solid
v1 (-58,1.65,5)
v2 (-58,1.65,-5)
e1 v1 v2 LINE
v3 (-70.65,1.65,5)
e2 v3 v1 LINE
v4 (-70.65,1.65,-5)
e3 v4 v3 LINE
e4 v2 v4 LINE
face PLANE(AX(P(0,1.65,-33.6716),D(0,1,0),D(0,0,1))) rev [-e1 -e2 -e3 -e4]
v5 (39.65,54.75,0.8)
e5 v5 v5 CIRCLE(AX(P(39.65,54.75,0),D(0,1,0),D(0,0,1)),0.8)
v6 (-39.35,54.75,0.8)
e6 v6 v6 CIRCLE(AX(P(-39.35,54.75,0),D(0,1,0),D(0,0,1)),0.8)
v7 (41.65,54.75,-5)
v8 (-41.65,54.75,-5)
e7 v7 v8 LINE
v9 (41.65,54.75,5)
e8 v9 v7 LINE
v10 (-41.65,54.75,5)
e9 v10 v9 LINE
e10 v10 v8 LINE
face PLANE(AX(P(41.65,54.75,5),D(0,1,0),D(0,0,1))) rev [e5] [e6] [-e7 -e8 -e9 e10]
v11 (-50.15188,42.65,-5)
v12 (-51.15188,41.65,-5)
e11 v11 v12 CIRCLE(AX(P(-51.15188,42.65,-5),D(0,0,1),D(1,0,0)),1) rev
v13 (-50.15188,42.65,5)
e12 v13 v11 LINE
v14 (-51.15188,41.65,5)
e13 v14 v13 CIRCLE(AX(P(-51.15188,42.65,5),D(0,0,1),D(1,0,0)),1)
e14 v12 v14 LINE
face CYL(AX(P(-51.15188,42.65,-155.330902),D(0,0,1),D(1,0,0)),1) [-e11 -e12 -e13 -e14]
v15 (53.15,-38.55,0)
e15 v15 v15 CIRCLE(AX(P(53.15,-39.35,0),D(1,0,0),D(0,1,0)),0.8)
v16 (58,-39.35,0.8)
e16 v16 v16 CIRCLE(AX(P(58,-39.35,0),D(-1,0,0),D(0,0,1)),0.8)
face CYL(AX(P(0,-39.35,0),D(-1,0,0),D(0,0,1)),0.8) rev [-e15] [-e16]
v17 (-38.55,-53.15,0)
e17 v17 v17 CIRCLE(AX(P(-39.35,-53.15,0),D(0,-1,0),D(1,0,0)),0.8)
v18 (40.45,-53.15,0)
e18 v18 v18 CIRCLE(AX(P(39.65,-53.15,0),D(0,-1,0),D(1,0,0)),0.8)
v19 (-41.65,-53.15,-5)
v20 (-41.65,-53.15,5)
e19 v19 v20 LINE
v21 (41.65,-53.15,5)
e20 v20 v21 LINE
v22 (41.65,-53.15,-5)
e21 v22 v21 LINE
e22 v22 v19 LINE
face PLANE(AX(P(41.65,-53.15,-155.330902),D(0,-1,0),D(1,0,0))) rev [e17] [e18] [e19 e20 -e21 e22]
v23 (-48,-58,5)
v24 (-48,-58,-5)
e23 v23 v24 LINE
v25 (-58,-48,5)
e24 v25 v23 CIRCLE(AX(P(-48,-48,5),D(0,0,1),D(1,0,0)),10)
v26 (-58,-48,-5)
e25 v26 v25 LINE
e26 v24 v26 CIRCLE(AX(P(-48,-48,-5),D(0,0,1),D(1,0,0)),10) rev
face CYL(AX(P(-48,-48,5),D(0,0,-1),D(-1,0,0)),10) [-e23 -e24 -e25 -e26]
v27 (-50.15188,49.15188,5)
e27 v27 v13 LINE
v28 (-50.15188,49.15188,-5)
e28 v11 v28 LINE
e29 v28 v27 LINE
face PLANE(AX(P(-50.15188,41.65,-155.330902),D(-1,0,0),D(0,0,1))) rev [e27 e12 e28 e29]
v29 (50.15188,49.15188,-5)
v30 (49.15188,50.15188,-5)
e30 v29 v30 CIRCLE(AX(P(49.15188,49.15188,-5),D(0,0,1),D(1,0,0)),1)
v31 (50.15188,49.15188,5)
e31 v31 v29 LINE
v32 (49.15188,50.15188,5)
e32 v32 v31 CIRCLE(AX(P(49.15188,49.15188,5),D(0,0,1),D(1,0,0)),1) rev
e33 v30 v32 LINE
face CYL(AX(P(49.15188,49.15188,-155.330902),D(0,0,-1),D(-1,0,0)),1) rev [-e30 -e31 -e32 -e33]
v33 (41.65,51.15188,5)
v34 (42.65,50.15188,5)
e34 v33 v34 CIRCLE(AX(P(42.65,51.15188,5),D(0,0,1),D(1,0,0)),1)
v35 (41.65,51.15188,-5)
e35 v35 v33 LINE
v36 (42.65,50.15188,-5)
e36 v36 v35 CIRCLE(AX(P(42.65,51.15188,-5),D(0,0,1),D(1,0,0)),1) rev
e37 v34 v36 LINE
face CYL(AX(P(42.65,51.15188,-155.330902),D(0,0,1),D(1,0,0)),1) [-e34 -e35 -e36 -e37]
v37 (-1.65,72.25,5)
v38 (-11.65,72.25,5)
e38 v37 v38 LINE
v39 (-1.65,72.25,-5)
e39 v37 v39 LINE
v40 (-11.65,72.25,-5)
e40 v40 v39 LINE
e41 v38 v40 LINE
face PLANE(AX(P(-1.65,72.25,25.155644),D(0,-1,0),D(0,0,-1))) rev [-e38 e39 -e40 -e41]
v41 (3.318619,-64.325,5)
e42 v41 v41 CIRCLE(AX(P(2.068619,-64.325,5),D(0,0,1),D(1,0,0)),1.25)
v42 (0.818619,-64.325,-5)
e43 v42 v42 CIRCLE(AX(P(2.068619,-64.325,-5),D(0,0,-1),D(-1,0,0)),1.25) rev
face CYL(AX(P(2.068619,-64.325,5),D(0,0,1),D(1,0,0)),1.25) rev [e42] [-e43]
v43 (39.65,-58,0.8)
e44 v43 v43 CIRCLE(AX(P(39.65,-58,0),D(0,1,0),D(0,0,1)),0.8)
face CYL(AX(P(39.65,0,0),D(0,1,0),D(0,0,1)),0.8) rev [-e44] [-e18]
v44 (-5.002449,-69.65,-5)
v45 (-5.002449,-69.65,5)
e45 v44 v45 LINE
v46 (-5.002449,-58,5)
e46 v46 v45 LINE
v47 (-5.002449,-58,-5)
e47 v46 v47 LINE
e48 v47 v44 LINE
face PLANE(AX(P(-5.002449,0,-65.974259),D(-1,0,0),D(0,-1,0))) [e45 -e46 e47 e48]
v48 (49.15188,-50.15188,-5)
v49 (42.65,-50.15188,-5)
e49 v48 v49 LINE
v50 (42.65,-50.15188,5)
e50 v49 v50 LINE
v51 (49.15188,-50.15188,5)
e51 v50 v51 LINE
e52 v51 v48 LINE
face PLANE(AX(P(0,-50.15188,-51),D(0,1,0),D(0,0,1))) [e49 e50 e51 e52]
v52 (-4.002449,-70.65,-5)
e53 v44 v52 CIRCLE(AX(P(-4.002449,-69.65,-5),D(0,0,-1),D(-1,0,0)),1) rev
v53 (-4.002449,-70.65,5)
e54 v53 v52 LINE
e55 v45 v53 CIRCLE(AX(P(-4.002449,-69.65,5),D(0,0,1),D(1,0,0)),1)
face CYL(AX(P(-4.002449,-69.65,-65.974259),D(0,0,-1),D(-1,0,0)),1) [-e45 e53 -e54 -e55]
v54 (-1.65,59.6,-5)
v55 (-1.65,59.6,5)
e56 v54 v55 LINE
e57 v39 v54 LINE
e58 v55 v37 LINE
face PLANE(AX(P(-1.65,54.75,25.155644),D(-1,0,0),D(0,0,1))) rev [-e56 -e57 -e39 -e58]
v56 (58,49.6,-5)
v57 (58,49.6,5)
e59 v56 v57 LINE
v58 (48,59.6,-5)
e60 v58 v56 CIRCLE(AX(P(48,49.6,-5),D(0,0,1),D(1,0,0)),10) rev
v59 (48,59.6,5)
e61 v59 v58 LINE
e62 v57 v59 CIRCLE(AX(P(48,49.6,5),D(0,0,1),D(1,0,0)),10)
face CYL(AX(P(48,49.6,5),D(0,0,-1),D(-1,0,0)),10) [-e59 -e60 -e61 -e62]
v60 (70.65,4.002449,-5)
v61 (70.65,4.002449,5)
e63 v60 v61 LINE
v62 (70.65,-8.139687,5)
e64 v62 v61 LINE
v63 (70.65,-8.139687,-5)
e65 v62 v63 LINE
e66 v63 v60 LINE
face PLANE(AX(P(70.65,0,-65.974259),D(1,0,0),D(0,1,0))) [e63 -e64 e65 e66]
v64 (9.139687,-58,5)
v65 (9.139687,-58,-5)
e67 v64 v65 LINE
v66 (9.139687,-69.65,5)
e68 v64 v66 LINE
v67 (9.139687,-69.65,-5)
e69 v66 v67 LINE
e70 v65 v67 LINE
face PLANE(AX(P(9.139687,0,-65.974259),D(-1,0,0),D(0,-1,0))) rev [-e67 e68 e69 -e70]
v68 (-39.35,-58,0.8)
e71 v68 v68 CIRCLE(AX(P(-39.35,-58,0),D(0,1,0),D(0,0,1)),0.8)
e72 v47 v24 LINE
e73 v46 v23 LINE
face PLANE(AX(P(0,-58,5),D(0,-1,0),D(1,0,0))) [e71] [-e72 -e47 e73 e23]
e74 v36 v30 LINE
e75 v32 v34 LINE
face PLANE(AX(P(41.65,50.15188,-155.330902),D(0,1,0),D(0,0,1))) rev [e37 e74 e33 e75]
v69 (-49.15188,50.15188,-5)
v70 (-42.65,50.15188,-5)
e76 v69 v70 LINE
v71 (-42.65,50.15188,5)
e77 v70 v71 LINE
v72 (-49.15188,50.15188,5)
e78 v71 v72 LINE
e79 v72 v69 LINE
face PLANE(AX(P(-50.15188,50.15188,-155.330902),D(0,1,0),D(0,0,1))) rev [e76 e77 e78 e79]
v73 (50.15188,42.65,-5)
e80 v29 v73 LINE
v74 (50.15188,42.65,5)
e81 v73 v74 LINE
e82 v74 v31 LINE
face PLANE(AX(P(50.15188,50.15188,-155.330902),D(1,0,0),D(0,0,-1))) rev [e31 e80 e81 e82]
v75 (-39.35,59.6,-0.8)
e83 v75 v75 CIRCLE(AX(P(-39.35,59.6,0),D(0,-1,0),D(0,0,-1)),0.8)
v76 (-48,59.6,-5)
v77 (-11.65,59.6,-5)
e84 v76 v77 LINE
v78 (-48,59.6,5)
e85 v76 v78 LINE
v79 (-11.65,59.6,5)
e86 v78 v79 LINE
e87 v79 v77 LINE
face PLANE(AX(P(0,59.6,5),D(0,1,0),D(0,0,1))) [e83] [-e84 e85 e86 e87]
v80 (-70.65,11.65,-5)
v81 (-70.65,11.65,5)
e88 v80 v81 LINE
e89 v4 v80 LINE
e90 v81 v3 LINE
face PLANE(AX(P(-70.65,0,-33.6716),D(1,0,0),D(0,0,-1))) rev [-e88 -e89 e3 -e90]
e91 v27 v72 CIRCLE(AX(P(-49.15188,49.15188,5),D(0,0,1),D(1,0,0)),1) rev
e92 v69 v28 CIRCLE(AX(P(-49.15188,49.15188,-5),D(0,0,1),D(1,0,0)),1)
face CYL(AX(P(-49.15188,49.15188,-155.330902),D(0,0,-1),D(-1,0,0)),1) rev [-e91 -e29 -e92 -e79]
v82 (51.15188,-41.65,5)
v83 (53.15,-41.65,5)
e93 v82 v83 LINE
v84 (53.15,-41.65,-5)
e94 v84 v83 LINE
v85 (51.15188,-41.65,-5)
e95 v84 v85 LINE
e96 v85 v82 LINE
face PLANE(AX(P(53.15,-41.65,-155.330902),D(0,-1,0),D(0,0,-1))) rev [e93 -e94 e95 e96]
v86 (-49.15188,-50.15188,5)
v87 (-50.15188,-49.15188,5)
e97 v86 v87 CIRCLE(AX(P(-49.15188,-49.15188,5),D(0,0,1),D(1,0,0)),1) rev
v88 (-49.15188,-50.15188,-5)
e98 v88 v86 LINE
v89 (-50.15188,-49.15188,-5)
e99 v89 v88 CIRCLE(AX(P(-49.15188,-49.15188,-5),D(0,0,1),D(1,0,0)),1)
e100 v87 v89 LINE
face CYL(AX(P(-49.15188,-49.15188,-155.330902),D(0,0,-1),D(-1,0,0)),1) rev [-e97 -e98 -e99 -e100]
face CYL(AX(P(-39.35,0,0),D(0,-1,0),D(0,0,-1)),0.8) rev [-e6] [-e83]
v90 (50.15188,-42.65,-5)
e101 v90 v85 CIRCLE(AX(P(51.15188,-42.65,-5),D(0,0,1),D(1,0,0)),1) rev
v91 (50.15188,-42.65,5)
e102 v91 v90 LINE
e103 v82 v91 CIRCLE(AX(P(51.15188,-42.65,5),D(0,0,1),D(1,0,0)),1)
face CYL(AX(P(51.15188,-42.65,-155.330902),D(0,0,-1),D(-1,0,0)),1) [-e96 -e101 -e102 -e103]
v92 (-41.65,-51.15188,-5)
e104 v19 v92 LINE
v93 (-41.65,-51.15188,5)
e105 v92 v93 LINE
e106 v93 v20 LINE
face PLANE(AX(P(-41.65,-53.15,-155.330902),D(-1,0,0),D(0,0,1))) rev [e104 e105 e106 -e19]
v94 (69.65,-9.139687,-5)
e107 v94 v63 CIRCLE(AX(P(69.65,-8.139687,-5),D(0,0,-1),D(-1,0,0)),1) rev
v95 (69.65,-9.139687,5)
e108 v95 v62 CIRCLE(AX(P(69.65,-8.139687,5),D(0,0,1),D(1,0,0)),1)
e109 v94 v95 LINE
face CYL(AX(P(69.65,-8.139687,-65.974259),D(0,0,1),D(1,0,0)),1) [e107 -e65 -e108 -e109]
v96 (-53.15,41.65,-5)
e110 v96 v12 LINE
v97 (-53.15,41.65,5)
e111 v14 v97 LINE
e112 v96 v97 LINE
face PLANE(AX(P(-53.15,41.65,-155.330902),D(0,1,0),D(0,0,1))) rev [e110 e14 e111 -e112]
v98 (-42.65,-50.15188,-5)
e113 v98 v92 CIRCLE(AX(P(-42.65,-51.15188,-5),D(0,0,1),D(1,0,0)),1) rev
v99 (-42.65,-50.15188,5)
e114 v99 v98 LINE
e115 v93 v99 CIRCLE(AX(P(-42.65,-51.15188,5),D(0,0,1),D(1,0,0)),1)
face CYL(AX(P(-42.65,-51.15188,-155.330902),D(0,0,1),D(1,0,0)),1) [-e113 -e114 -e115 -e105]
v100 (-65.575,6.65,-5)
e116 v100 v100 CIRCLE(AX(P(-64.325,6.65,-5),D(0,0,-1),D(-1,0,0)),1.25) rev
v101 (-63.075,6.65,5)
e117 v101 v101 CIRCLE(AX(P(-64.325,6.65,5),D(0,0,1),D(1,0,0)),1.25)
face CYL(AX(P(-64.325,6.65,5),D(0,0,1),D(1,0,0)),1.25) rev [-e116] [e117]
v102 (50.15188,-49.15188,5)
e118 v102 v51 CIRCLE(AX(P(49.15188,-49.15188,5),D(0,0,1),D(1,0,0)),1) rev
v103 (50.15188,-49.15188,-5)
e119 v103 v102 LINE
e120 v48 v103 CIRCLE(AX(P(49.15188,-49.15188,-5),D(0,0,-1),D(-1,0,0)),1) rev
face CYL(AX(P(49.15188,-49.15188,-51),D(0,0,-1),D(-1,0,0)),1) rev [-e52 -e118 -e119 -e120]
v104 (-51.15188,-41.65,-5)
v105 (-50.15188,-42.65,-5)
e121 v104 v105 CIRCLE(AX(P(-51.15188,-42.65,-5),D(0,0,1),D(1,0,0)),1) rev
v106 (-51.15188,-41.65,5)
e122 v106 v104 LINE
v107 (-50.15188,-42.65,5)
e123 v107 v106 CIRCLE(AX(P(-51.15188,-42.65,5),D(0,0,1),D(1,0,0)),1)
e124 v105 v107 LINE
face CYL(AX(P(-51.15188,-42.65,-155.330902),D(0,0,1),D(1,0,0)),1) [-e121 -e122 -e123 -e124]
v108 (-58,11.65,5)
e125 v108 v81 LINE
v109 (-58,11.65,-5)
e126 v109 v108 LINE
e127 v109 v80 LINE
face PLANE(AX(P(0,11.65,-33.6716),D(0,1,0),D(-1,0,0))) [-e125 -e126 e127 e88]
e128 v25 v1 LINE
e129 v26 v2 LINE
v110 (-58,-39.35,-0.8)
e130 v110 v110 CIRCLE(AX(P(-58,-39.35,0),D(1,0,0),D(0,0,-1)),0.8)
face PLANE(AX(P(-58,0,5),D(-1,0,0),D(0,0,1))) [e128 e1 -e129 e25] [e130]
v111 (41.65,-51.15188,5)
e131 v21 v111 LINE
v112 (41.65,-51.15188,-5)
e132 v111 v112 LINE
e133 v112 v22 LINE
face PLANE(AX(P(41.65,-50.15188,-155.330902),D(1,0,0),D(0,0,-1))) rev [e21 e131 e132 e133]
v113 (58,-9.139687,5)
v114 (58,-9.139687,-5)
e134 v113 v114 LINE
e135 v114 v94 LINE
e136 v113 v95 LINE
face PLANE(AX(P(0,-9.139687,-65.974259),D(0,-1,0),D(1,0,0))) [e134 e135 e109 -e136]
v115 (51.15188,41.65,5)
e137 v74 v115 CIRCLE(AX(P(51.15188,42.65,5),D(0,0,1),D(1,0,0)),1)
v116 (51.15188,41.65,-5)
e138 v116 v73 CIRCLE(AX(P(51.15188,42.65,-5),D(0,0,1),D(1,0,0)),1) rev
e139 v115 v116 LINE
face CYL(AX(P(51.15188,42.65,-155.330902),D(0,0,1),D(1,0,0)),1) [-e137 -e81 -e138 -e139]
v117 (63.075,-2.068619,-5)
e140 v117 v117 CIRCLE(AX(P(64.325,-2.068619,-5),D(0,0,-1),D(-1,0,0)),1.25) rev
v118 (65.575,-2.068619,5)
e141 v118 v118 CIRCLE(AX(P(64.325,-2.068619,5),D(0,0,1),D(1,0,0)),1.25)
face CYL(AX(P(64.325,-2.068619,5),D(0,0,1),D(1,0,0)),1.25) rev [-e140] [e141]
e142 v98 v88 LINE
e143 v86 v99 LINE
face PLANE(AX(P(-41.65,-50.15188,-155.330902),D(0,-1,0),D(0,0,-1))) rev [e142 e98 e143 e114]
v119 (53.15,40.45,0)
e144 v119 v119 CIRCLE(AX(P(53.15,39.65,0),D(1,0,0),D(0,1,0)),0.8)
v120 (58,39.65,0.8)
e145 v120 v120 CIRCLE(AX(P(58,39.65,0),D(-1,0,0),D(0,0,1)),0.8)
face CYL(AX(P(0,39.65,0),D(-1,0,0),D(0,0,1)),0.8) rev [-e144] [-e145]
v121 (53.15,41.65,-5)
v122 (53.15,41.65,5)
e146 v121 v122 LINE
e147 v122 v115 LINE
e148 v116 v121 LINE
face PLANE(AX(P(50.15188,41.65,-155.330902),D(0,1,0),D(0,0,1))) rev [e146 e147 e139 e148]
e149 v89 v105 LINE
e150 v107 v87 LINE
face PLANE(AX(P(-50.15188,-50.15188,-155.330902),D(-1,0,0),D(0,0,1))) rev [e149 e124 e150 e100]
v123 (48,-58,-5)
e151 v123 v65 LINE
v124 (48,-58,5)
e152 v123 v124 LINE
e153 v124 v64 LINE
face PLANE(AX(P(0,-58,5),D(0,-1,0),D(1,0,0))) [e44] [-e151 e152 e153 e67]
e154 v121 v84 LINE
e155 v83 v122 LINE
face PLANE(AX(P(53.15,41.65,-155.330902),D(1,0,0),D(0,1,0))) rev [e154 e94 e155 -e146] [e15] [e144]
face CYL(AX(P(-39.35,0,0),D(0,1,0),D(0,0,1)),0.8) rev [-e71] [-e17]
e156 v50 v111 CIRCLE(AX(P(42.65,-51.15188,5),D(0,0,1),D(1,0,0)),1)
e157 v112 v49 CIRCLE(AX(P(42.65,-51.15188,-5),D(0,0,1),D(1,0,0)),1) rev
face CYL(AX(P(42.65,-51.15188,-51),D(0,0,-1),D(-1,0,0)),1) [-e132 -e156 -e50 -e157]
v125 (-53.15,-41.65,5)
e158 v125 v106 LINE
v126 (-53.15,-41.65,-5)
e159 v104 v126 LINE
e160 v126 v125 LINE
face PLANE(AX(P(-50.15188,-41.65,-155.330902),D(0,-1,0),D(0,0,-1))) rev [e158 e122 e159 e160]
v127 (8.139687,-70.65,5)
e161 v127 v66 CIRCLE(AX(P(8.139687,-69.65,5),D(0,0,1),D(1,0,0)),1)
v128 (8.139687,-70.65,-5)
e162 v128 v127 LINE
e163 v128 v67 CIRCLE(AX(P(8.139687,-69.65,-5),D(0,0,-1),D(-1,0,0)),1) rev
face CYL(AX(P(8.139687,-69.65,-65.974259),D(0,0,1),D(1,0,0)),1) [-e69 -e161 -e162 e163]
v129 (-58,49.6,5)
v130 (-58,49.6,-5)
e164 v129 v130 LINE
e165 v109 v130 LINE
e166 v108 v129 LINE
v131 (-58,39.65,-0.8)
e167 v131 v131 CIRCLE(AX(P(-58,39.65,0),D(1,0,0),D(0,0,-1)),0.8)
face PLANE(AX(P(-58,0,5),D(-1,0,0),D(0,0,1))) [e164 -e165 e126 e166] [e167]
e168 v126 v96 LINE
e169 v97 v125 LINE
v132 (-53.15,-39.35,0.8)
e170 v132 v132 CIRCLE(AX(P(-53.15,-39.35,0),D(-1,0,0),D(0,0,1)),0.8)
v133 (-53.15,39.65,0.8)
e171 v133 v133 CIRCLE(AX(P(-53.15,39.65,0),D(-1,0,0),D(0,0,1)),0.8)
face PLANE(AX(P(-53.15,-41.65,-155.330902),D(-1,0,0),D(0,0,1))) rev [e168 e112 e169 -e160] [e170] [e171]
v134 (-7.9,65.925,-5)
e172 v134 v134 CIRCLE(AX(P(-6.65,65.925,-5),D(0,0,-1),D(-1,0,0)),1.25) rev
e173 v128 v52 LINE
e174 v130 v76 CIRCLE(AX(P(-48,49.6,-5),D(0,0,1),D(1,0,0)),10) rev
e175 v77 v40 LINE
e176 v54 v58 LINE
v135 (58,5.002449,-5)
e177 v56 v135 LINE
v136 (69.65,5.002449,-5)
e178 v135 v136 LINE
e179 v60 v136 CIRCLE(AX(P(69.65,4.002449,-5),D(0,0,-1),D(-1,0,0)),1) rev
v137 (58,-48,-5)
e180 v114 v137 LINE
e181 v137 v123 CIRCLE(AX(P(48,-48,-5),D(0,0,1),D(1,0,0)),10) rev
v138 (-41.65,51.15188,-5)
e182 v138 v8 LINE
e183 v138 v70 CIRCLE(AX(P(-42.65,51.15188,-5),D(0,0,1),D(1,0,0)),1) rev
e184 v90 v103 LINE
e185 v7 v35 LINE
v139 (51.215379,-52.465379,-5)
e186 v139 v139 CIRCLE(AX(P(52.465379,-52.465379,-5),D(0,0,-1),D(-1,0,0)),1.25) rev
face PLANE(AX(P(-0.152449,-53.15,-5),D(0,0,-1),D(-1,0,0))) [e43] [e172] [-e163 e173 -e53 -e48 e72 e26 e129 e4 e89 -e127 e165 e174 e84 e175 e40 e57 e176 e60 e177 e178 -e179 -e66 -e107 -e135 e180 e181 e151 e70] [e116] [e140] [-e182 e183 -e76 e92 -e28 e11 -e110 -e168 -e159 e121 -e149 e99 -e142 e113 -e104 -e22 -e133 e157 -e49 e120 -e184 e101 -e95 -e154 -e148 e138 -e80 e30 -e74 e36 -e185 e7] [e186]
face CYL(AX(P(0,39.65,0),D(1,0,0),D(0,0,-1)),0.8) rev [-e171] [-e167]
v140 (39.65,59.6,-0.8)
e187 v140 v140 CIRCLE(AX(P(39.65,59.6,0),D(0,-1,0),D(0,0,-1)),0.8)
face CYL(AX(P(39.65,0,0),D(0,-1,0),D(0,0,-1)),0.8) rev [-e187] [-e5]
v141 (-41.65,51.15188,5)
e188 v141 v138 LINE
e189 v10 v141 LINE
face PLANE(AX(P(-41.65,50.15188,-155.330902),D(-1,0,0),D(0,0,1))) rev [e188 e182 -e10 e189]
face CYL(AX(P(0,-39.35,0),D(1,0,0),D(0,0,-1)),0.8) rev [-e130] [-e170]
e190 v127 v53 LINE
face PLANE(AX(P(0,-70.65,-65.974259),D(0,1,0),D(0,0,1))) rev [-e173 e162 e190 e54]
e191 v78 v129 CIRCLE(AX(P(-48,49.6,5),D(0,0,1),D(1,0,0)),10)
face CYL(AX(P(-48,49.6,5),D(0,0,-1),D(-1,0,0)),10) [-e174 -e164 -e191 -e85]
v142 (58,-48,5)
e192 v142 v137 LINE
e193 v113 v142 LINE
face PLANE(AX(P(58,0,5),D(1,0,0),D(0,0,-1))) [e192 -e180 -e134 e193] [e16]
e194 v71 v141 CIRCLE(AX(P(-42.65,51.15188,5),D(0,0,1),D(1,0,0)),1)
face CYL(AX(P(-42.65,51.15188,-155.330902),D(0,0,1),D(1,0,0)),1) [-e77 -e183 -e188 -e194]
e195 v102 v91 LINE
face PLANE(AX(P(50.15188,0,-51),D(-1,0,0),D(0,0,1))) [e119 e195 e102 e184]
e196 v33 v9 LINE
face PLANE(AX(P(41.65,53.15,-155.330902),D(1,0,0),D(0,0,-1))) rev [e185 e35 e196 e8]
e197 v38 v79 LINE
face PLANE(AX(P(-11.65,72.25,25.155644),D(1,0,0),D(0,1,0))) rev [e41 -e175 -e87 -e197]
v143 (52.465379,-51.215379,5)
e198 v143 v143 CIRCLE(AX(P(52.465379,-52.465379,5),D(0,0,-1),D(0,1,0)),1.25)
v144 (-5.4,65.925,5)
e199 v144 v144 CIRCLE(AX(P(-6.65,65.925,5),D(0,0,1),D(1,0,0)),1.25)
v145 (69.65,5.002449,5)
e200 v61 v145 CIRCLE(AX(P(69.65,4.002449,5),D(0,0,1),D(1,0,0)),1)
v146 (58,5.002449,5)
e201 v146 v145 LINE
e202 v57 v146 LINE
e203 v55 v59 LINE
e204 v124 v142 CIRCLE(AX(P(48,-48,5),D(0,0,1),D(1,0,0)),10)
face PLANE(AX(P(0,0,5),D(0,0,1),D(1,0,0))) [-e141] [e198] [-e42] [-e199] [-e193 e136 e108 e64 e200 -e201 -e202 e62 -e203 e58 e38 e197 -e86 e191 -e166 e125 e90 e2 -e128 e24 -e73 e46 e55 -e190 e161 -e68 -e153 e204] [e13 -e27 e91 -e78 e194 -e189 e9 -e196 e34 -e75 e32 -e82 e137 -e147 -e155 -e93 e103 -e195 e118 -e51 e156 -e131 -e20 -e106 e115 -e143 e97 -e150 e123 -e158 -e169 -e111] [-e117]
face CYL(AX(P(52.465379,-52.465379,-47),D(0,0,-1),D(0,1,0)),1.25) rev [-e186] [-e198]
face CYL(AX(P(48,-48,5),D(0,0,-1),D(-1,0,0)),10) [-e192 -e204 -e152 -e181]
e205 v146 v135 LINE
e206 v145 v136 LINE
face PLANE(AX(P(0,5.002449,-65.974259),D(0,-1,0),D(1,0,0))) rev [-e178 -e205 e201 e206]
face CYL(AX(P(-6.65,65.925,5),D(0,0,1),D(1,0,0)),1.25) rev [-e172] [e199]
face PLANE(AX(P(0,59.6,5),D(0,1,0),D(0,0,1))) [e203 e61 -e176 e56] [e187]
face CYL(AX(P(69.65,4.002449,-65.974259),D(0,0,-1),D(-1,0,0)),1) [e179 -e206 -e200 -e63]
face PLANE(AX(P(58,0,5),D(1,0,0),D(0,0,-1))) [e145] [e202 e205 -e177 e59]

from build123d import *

# Parameters (mm, degrees)
SKETCH1_W                      = 116
SKETCH1_H                      = 117.6
BASE_DEPTH                     = 5
ARM_DEPTH                      = 5
CUT_EXTRUDE1_DEPTH             = 99.905226688
BOSS_EXTRUDE4_DEPTH            = 31
CLEARANCE_DEPTH                = 20
CUT_EXTRUDE2_DEPTH             = 94.167376264
CUT_EXTRUDE2_DEPTH_BACK        = 94.167376264
SKETCH42_W                     = 83.3
SKETCH42_H                     = 1.6
SKETCH12_W                     = 0.8
SKETCH12_H                     = 59.6
M2X0_4_TAPPED_HOLE1_AT_2_COUNT = 2
M2X0_4_TAPPED_HOLE1_AT_2_PITCH = 79
MIRROR1_COPY_1_SKETCH_W        = 0.8
MIRROR1_COPY_1_SKETCH_H        = 59.6
SKETCH15_W                     = 0.8
SKETCH15_H                     = 58
M2X0_4_TAPPED_HOLE2_AT_2_COUNT = 2
M2X0_4_TAPPED_HOLE2_AT_2_PITCH = 79
MIRROR2_COPY_1_SKETCH_W        = 0.8
MIRROR2_COPY_1_SKETCH_H        = 58
SKETCH16_W                     = 17.5
SKETCH16_H                     = 10
EXTENDER_DEPTH                 = 28.6716
ANGLED_HORIZONTAL_DEPTH        = 13.3284
ARM_START                      = -5
SKETCH21_W                     = 17.5
SKETCH21_H                     = 10
SKETCH21_W_2                   = 10
SKETCH21_H_2                   = 17.5
ARM_HOLDER_DEPTH               = 10
SKETCH44_W                     = 10
SKETCH44_H                     = 17.5
BOSS_EXTRUDE20_DEPTH           = 28.6716
BOSS_EXTRUDE21_DEPTH           = 13.3284
BOSS_EXTRUDE22_DEPTH           = 79.266670171
FILLET1_R                      = 1
FILLET2_R                      = 10
M3X0_5_TAPPED_HOLE2_D          = 2.5
M3X0_5_TAPPED_HOLE3_D          = 2.5
M3X0_5_TAPPED_HOLE3_DEPTH      = 29.81
M3X0_5_TAPPED_HOLE3_TIP        = 0.751075774
FILLET3_R                      = 1
BOSS_EXTRUDE23_REACH           = 300.947
SKETCH47_W                     = 11
SKETCH47_H                     = 10
BOSS_EXTRUDE24_DEPTH           = 31
SKETCH48_3_W                   = 14.142135624
SKETCH48_3_H                   = 12.65
BOSS_EXTRUDE25_DEPTH           = 42
SKETCH48_4_W                   = 14.142135624
SKETCH48_4_H                   = 12.65
BOSS_EXTRUDE26_DEPTH           = 10
FILLET6_R                      = 1
M3X0_5_TAPPED_HOLE5_D          = 2.5
M3X0_5_TAPPED_HOLE5_DEPTH      = 29.81
M3X0_5_TAPPED_HOLE5_TIP        = 0.751075774
SPLIT1_START                   = -47
SPLIT1_OUTLINE_R               = 1.25
SPLIT1_DEPTH                   = 42


# Read off the part's stored shape, not the designer's step: Split1
with BuildPart() as part:
    # Sketch1 → base (new, symmetric)
    with BuildSketch(Plane.XY):
        with Locations((0, 0.8)):
            Rectangle(SKETCH1_W, SKETCH1_H)
        Polygon((50.00188016, -50.00188016), (41.5, -50.00188016), (41.5, -53), (-41.5, -53), (-41.5, -50.00188016), (-50.00188016, -50.00188016), (-50.00188016, -41.5), (-53, -41.5), (-53, 41.5), (-50.00188016, 41.5), (-50.00188016, 50.00188016), (-41.5, 50.00188016), (-41.5, 53), (41.5, 53), (41.5, 50.00188016), (50.00188016, 50.00188016), (50.00188016, 41.5), (53, 41.5), (53, -41.5), (50.00188016, -41.5), align=None, mode=Mode.SUBTRACT)
    extrude(amount=BASE_DEPTH, both=True)

    # Sketch2 → arm (add, symmetric)
    with BuildSketch(Plane(origin=(0, 0, 0), x_dir=(0.7071067811865476, -0.7071067811865475, 0), z_dir=(0.7071067811865475, 0.7071067811865476, 0))):
        Polygon((70.925469101, 5), (82.024386618, 5), (82.024386618, 47), (8.024386618, 47), (19.024386618, 36), (70.925469101, 36), align=None)
    extrude(amount=ARM_DEPTH, both=True)

    # Sketch3 → Cut-Extrude1 (cut, through all)
    with BuildSketch(Plane.XY):
        Polygon((54.818019485, -61.889087297), (61.889087297, -54.818019485), (58, -50.928932188), (58, -58), (50.928932188, -58), align=None)
    extrude(amount=-CUT_EXTRUDE1_DEPTH, mode=Mode.SUBTRACT)

    # Sketch5 → Boss-Extrude4 (add)
    with BuildSketch(Plane(origin=(0, 0, -5), x_dir=(-1, 0, 0), z_dir=(0, 0, -1))):
        Polygon((-50.15188016, -50.15188016), (-46.616346254, -53.687414066), (-43.080812348, -50.15188016), align=None)
        Polygon((-53.687414066, -46.616346254), (-50.15188016, -50.15188016), (-50.15188016, -43.080812348), align=None)
    extrude(amount=BOSS_EXTRUDE4_DEPTH)

    # Sketch7 → clearance (cut)
    with BuildSketch(Plane.XY.offset(15)):
        Polygon((-41.65, 53.15), (41.65, 53.15), (41.65, 50.15188016), (50.15188016, 50.15188016), (50.15188016, 41.65), (53.15, 41.65), (53.15, -41.65), (50.15188016, -41.65), (50.15188016, -50.15188016), (41.65, -50.15188016), (41.65, -53.15), (-41.65, -53.15), (-41.65, -50.15188016), (-50.15188016, -50.15188016), (-50.15188016, -41.65), (-53.15, -41.65), (-53.15, 41.65), (-50.15188016, 41.65), (-50.15188016, 50.15188016), (-41.65, 50.15188016), align=None)
    extrude(amount=-CLEARANCE_DEPTH, mode=Mode.SUBTRACT)

    # Sketch42 → Cut-Extrude2 (cut, two sides: drawn at the far end of the back side and taken through both)
    with BuildSketch(Plane(origin=(0, 0, -5), x_dir=(-1, 0, 0), z_dir=(0, 0, -1)).offset(-CUT_EXTRUDE2_DEPTH_BACK)):
        with Locations((0, 53.95)):
            Rectangle(SKETCH42_W, SKETCH42_H)
    extrude(amount=CUT_EXTRUDE2_DEPTH + CUT_EXTRUDE2_DEPTH_BACK, mode=Mode.SUBTRACT)

    # Sketch12 → M2x0.4 Tapped Hole1 (revolve, cut)
    with BuildSketch(Plane(origin=(-39.35, 0, 0), x_dir=(0, 0, -1), z_dir=(1, 0, 0))):
        with Locations((0.4, 29.8)):
            Rectangle(SKETCH12_W, SKETCH12_H)
    m2x0_4_tapped_hole1 = revolve(axis=Axis((-39.35, -6.35, 0), (0, 1, 0)), mode=Mode.SUBTRACT)

    # M2x0.4 Tapped Hole1 at 2: M2x0.4 Tapped Hole1 ×2
    with Locations(*[(i * M2X0_4_TAPPED_HOLE1_AT_2_PITCH, 0, 0) for i in range(1, M2X0_4_TAPPED_HOLE1_AT_2_COUNT)]):
        add(m2x0_4_tapped_hole1, mode=Mode.SUBTRACT)

    # Mirror1: M2x0.4 Tapped Hole1 across plane
    add(m2x0_4_tapped_hole1.mirror(Plane.ZX), mode=Mode.SUBTRACT)

    # Mirror1 copy 1 sketch → Mirror1 copy 1 (revolve, cut)
    with BuildSketch(Plane(origin=(39.65, 0, 0), x_dir=(0, 0, -1), z_dir=(1, 0, 0))):
        with Locations((0.4, -29.8)):
            Rectangle(MIRROR1_COPY_1_SKETCH_W, MIRROR1_COPY_1_SKETCH_H)
    revolve(axis=Axis((39.65, 6.35, 0), (0, 1, 0)), mode=Mode.SUBTRACT)

    # Sketch15 → M2x0.4 Tapped Hole2 (revolve, cut)
    with BuildSketch(Plane.ZX.offset(39.65)):
        with Locations((0.4, 29)):
            Rectangle(SKETCH15_W, SKETCH15_H)
    m2x0_4_tapped_hole2 = revolve(axis=Axis((-6.35, 39.65, 0), (1, 0, 0)), mode=Mode.SUBTRACT)

    # M2x0.4 Tapped Hole2 at 2: M2x0.4 Tapped Hole2 ×2
    with Locations(*[(0, -i * M2X0_4_TAPPED_HOLE2_AT_2_PITCH, 0) for i in range(1, M2X0_4_TAPPED_HOLE2_AT_2_COUNT)]):
        add(m2x0_4_tapped_hole2, mode=Mode.SUBTRACT)

    # Mirror2: M2x0.4 Tapped Hole2 across plane
    add(m2x0_4_tapped_hole2.mirror(Plane(origin=(0, 0, 0), x_dir=(0, 0, 1), z_dir=(1, 0, 0))), mode=Mode.SUBTRACT)

    # Mirror2 copy 1 sketch → Mirror2 copy 1 (revolve, cut)
    with BuildSketch(Plane.ZX.offset(-39.35)):
        with Locations((0.4, -29)):
            Rectangle(MIRROR2_COPY_1_SKETCH_W, MIRROR2_COPY_1_SKETCH_H)
    revolve(axis=Axis((6.35, -39.35, 0), (1, 0, 0)), mode=Mode.SUBTRACT)

    # Sketch16 → extender (add)
    with BuildSketch(Plane(origin=(0, 0, -5), x_dir=(-1, 0, 0), z_dir=(0, 0, -1))):
        with Locations((61.9, 6.65)):
            Rectangle(SKETCH16_W, SKETCH16_H)
    extrude(amount=EXTENDER_DEPTH)

    # Sketch17 → angled horizontal (add)
    with BuildSketch(Plane(origin=(0, 0, -33.6716), x_dir=(-1, 0, 0), z_dir=(0, 0, -1))):
        Polygon((194.571356237, 153.071356237), (208.321356237, 139.321356237), (70.65, 1.65), (53.15, 1.65), (53.15, 11.65), align=None)
    extrude(amount=ANGLED_HORIZONTAL_DEPTH)

    # Sketch21 → Arm Holder (add)
    with BuildSketch(Plane.XY.offset(ARM_START)):
        with Locations((-61.9, 6.65)):
            Rectangle(SKETCH21_W, SKETCH21_H)
        with Locations((-6.65, 63.5)):
            Rectangle(SKETCH21_W_2, SKETCH21_H_2)
    extrude(amount=ARM_HOLDER_DEPTH)

    # Sketch44 → Boss-Extrude20 (add)
    with BuildSketch(Plane(origin=(0, 0, -5), x_dir=(-1, 0, 0), z_dir=(0, 0, -1))):
        with Locations((6.65, 63.5)):
            Rectangle(SKETCH44_W, SKETCH44_H)
    extrude(amount=BOSS_EXTRUDE20_DEPTH)

    # Sketch45 → Boss-Extrude21 (add)
    with BuildSketch(Plane(origin=(0, 0, -33.6716), x_dir=(-1, 0, 0), z_dir=(0, 0, -1))):
        Polygon((1.65, 72.25), (1.65, 54.75), (11.65, 54.75), (152.271356237, 195.371356237), (138.521356237, 209.121356237), align=None)
    extrude(amount=BOSS_EXTRUDE21_DEPTH)

    # Sketch46 → Boss-Extrude22 (add)
    with BuildSketch(Plane(origin=(-34.5, -34.5, 0), x_dir=(0, 0, 1), z_dir=(-0.7071067811865476, -0.7071067811865476, 0))):
        Polygon((-47, 232.492119421), (-47, 245.820519421), (-33.6716, 245.820519421), align=None)
    extrude(amount=-BOSS_EXTRUDE22_DEPTH)

    # Fillet1
    fillet1_edges = [part.edges().sort_by_distance(p)[0] for p in [
        (50.15188016, -50.15188016, -15.5),
        (-41.65, 50.15188016, 0),
        (41.65, 50.15188016, 0),
        (50.15188016, 50.15188016, 0),
        (50.15188016, 41.65, 0),
        (50.15188016, -41.65, 0),
        (41.65, -50.15188016, 0),
        (-41.65, -50.15188016, 0),
        (-50.15188016, -50.15188016, 0),
        (-50.15188016, -41.65, 0),
        (-50.15188016, 41.65, 0),
        (-50.15188016, 50.15188016, 0),
    ]]
    fillet(fillet1_edges, radius=FILLET1_R)

    # Fillet2
    # the kernel refuses this fillet: 10 mm, written as the material it takes off along each edge
    with BuildSketch(Plane(origin=(58, -58, -72), x_dir=(-1, 0, 0), z_dir=(0, 0, 1))) as fillet2_piece_1:
        with BuildLine():
            CenterArc((FILLET2_R, -FILLET2_R), FILLET2_R, 90, 90)
            Line((0, -FILLET2_R), (0, 0))
            Line((0, 0), (FILLET2_R, 0))
        make_face()
    extrude(amount=102, mode=Mode.SUBTRACT)
    with BuildSketch(Plane(origin=(-58, -58, 30), x_dir=(0, 1, 0), z_dir=(0, 0, -1)), Plane(origin=(-58, 59.6, 30), x_dir=(1, 0, 0), z_dir=(0, 0, -1))) as fillet2_piece_2:
        with BuildLine():
            CenterArc((FILLET2_R, FILLET2_R), FILLET2_R, 180, 90)
            Line((0, FILLET2_R), (0, 0))
            Line((0, 0), (FILLET2_R, 0))
        make_face()
    extrude(amount=60, mode=Mode.SUBTRACT)
    with BuildSketch(Plane(origin=(58, 59.6, -30), x_dir=(0, -1, 0), z_dir=(0, 0, 1))) as fillet2_piece_3:
        with BuildLine():
            CenterArc((FILLET2_R, -FILLET2_R), FILLET2_R, 90, 90)
            Line((0, -FILLET2_R), (0, 0))
            Line((0, 0), (FILLET2_R, 0))
        make_face()
    extrude(amount=60, mode=Mode.SUBTRACT)

    # M3x0.5 Tapped Hole2 (through all)
    with Locations(Plane(origin=(0, 0, -47), x_dir=(-1, 0, 0), z_dir=(0, 0, -1))):
        with Locations((-52.465379323, -52.465379323)):
            Hole(M3X0_5_TAPPED_HOLE2_D / 2)

    # M3x0.5 Tapped Hole3
    with Locations(Plane.XY.offset(5)):
        with Locations((-64.325, 6.65), (-6.65, 65.925)):
            Hole(M3X0_5_TAPPED_HOLE3_D / 2, depth=M3X0_5_TAPPED_HOLE3_DEPTH)
            with Locations((0, 0, -(M3X0_5_TAPPED_HOLE3_DEPTH + M3X0_5_TAPPED_HOLE3_TIP / 2))):  # 118° drill point
                Cone(0, M3X0_5_TAPPED_HOLE3_D / 2, M3X0_5_TAPPED_HOLE3_TIP, mode=Mode.SUBTRACT)

    # Fillet3
    fillet3_edges = [part.edges().sort_by_distance(p)[0] for p in [
        (-53.15, 1.65, -26),
        (-1.65, 54.75, -26),
    ]]
    fillet(fillet3_edges, radius=FILLET3_R)

    # Boss-Extrude23: up to this plane
    boss_extrude23_end = Plane(origin=(0, -58, 5), z_dir=(0, -1, 0))
    # Sketch47 → Boss-Extrude23 (add, up to the surface)
    with BuildSketch(Plane(origin=(-3.535533906, -3.535533906, 0), x_dir=(0, 0, 1), z_dir=(-0.7071067811865472, -0.7071067811865478, 0)), mode=Mode.PRIVATE) as boss_extrude23_sk1:
        with Locations((-41.5, -42.474927859)):
            Rectangle(SKETCH47_W, SKETCH47_H)
    boss_extrude23_tool1 = split(extrude(boss_extrude23_sk1.sketch, amount=BOSS_EXTRUDE23_REACH, mode=Mode.PRIVATE), bisect_by=boss_extrude23_end, keep=Keep.BOTH, mode=Mode.PRIVATE)
    boss_extrude23 = boss_extrude23_tool1.solids().sort_by_distance((26.498776, -33.569843, -41.5))[0]
    add(boss_extrude23)

    # Sketch48 → Boss-Extrude24 (add)
    with BuildSketch(Plane(origin=(0, 0, -5), x_dir=(-1, 0, 0), z_dir=(0, 0, -1))):
        Polygon((-13.989686851, -53.15), (-9.139686851, -58), (5.002448773, -58), (0.152448773, -53.15), align=None)
    boss_extrude24 = extrude(amount=BOSS_EXTRUDE24_DEPTH)

    # Sketch48<3> → Boss-Extrude25 (add)
    with BuildSketch(Plane(origin=(0, 0, -5), x_dir=(-1, 0, 0), z_dir=(0, 0, -1))):
        with Locations((-2.068619039, -64.325)):
            Rectangle(SKETCH48_3_W, SKETCH48_3_H)
    boss_extrude25 = extrude(amount=BOSS_EXTRUDE25_DEPTH)

    # Sketch48<4> → Boss-Extrude26 (add)
    with BuildSketch(Plane(origin=(0, 0, -5), x_dir=(-1, 0, 0), z_dir=(0, 0, -1))):
        with Locations((-2.068619039, -64.325)):
            Rectangle(SKETCH48_4_W, SKETCH48_4_H)
    boss_extrude26 = extrude(amount=-BOSS_EXTRUDE26_DEPTH)

    # Sketch50 → M3x0.5 Tapped Hole4 (revolve, cut)
    with BuildSketch(Plane(origin=(2.068619039, -64.325, 5), x_dir=(0, -1, 0), z_dir=(1, 0, 0))):
        Polygon((0, 0), (0, 30.561075774), (1.25, 29.81), (1.25, 0), align=None)
    m3x0_5_tapped_hole4 = revolve(axis=Axis((2.068619039, -64.325, 11.35), (0, 0, -1)), mode=Mode.SUBTRACT)

    # Mirror3: Boss-Extrude23, Boss-Extrude24, Boss-Extrude25, Boss-Extrude26, M3x0.5 Tapped Hole4 across plane
    add(boss_extrude23.mirror(Plane(origin=(0, 0, 0), x_dir=(0, 0, 1), z_dir=(0.7071067811865475, 0.7071067811865476, 0))))
    add(boss_extrude24.mirror(Plane(origin=(0, 0, 0), x_dir=(0, 0, 1), z_dir=(0.7071067811865475, 0.7071067811865476, 0))))
    add(boss_extrude25.mirror(Plane(origin=(0, 0, 0), x_dir=(0, 0, 1), z_dir=(0.7071067811865475, 0.7071067811865476, 0))))
    add(boss_extrude26.mirror(Plane(origin=(0, 0, 0), x_dir=(0, 0, 1), z_dir=(0.7071067811865475, 0.7071067811865476, 0))))
    add(m3x0_5_tapped_hole4.mirror(Plane(origin=(0, 0, 0), x_dir=(0, 0, 1), z_dir=(0.7071067811865475, 0.7071067811865476, 0))), mode=Mode.SUBTRACT)

    # Fillet6
    fillet6_edges = [part.edges().sort_by_distance(p)[0] for p in [
        (2.068619039, -70.65, -47),
        (9.139686851, -70.65, -21),
        (-5.002448773, -70.65, -21),
        (70.65, -9.139686851, -21),
        (70.65, 5.002448773, -21),
        (70.65, -2.068619039, -47),
    ]]
    fillet(fillet6_edges, radius=FILLET6_R)

    # M3x0.5 Tapped Hole5
    with Locations(Plane(origin=(0, 0, -47), x_dir=(-1, 0, 0), z_dir=(0, 0, -1))):
        with Locations((-2.068619039, -63.825), (-63.825, -2.068619039), (62.4, 7.15), (7.15, 64)):
            Hole(M3X0_5_TAPPED_HOLE5_D / 2, depth=M3X0_5_TAPPED_HOLE5_DEPTH)
            with Locations((0, 0, -(M3X0_5_TAPPED_HOLE5_DEPTH + M3X0_5_TAPPED_HOLE5_TIP / 2))):  # 118° drill point
                Cone(0, M3X0_5_TAPPED_HOLE5_D / 2, M3X0_5_TAPPED_HOLE5_TIP, mode=Mode.SUBTRACT)

    # Split1 outline → Split1 (cut)
    # profile 1 of 2: a face of its own
    with BuildSketch(Plane.XY.offset(SPLIT1_START)):
        with BuildLine():
            Line((30.03430952, -22.963241708), (-47.678932174, 54.749999986))
            Line((-47.678932174, 54.749999986), (-53.149999983, 54.75))
            Line((-53.149999983, 54.75), (-53.15, 46.078932174))
            Line((-53.15, 46.078932174), (22.963241708, -30.03430952))
            Line((22.963241708, -30.03430952), (-5.002448773, -58))
            Line((-5.002448773, -58), (-5.002448773, -69.65))
            ThreePointArc((-5.002448773, -69.65), (-4.709555554, -70.357106781), (-4.002448773, -70.65))
            Line((-4.002448773, -70.65), (8.139686851, -70.65))
            ThreePointArc((8.139686851, -70.65), (8.846793632, -70.357106781), (9.139686851, -69.65))
            Line((9.139686851, -69.65), (9.139686851, -58))
            Line((9.139686851, -58), (30.03430952, -37.105377332))
            Line((30.03430952, -37.105377332), (50.588190451, -57.659258263))
            ThreePointArc((50.588190451, -57.659258263), (55.071067812, -55.071067812), (57.659258263, -50.588190451))
            Line((57.659258263, -50.588190451), (37.105377332, -30.03430952))
            Line((37.105377332, -30.03430952), (58, -9.139686851))
            Line((58, -9.139686851), (69.65, -9.139686851))
            ThreePointArc((69.65, -9.139686851), (70.357106781, -8.846793632), (70.65, -8.139686851))
            Line((70.65, -8.139686851), (70.65, 4.002448773))
            ThreePointArc((70.65, 4.002448773), (70.357106781, 4.709555554), (69.65, 5.002448773))
            Line((69.65, 5.002448773), (58, 5.002448773))
            Line((58, 5.002448773), (30.03430952, -22.963241708))
        make_face()
        with Locations((52.465379323, -52.465379323)):
            Circle(SPLIT1_OUTLINE_R, mode=Mode.SUBTRACT)
        with BuildLine():
            ThreePointArc((64.075, -0.843874168), (65.075, -2.068619039), (64.075, -3.29336391))
            ThreePointArc((64.075, -3.29336391), (63.075, -2.068619039), (64.075, -0.843874168))
        make_face(mode=Mode.SUBTRACT)
        with BuildLine():
            ThreePointArc((3.29336391, -64.075), (2.068619039, -65.075), (0.843874168, -64.075))
            ThreePointArc((0.843874168, -64.075), (2.068619039, -63.075), (3.29336391, -64.075))
        make_face(mode=Mode.SUBTRACT)
    # profile 2 of 2: a face of its own
    with BuildSketch(Plane.XY.offset(SPLIT1_START)):
        with BuildLine():
            Line((-53.149999983, 54.749999984), (-53.14999997, 96.24999997))
            Line((-53.14999997, 96.24999997), (-11.65, 54.75))
            Line((-11.65, 54.75), (-2.65, 54.75))
            ThreePointArc((-2.65, 54.75), (-1.942893219, 55.042893219), (-1.65, 55.75))
            Line((-1.65, 55.75), (-1.65, 72.25))
            Line((-1.65, 72.25), (-138.521356237, 209.121356237))
            Line((-138.521356237, 209.121356237), (-208.321356237, 139.321356237))
            Line((-208.321356237, 139.321356237), (-70.65, 1.65))
            Line((-70.65, 1.65), (-54.15, 1.65))
            ThreePointArc((-54.15, 1.65), (-53.442893219, 1.942893219), (-53.15, 2.65))
            Line((-53.15, 2.65), (-53.15, 11.65))
            Line((-53.15, 11.65), (-96.24999997, 54.74999997))
            Line((-96.24999997, 54.74999997), (-53.149999983, 54.749999984))
        make_face()
        with BuildLine():
            ThreePointArc((-63.552898996, 7.633036133), (-63.115145371, 6.964247955), (-63.172101004, 6.166963867))
            ThreePointArc((-63.172101004, 6.166963867), (-63.609854629, 6.835752045), (-63.552898996, 7.633036133))
        make_face(mode=Mode.SUBTRACT)
        with BuildLine():
            ThreePointArc((-6.166963867, 64.772101004), (-6.964247955, 64.715145371), (-7.633036133, 65.152898996))
            ThreePointArc((-7.633036133, 65.152898996), (-6.835752045, 65.209854629), (-6.166963867, 64.772101004))
        make_face(mode=Mode.SUBTRACT)
    extrude(amount=SPLIT1_DEPTH, mode=Mode.SUBTRACT)


solid = part.part
